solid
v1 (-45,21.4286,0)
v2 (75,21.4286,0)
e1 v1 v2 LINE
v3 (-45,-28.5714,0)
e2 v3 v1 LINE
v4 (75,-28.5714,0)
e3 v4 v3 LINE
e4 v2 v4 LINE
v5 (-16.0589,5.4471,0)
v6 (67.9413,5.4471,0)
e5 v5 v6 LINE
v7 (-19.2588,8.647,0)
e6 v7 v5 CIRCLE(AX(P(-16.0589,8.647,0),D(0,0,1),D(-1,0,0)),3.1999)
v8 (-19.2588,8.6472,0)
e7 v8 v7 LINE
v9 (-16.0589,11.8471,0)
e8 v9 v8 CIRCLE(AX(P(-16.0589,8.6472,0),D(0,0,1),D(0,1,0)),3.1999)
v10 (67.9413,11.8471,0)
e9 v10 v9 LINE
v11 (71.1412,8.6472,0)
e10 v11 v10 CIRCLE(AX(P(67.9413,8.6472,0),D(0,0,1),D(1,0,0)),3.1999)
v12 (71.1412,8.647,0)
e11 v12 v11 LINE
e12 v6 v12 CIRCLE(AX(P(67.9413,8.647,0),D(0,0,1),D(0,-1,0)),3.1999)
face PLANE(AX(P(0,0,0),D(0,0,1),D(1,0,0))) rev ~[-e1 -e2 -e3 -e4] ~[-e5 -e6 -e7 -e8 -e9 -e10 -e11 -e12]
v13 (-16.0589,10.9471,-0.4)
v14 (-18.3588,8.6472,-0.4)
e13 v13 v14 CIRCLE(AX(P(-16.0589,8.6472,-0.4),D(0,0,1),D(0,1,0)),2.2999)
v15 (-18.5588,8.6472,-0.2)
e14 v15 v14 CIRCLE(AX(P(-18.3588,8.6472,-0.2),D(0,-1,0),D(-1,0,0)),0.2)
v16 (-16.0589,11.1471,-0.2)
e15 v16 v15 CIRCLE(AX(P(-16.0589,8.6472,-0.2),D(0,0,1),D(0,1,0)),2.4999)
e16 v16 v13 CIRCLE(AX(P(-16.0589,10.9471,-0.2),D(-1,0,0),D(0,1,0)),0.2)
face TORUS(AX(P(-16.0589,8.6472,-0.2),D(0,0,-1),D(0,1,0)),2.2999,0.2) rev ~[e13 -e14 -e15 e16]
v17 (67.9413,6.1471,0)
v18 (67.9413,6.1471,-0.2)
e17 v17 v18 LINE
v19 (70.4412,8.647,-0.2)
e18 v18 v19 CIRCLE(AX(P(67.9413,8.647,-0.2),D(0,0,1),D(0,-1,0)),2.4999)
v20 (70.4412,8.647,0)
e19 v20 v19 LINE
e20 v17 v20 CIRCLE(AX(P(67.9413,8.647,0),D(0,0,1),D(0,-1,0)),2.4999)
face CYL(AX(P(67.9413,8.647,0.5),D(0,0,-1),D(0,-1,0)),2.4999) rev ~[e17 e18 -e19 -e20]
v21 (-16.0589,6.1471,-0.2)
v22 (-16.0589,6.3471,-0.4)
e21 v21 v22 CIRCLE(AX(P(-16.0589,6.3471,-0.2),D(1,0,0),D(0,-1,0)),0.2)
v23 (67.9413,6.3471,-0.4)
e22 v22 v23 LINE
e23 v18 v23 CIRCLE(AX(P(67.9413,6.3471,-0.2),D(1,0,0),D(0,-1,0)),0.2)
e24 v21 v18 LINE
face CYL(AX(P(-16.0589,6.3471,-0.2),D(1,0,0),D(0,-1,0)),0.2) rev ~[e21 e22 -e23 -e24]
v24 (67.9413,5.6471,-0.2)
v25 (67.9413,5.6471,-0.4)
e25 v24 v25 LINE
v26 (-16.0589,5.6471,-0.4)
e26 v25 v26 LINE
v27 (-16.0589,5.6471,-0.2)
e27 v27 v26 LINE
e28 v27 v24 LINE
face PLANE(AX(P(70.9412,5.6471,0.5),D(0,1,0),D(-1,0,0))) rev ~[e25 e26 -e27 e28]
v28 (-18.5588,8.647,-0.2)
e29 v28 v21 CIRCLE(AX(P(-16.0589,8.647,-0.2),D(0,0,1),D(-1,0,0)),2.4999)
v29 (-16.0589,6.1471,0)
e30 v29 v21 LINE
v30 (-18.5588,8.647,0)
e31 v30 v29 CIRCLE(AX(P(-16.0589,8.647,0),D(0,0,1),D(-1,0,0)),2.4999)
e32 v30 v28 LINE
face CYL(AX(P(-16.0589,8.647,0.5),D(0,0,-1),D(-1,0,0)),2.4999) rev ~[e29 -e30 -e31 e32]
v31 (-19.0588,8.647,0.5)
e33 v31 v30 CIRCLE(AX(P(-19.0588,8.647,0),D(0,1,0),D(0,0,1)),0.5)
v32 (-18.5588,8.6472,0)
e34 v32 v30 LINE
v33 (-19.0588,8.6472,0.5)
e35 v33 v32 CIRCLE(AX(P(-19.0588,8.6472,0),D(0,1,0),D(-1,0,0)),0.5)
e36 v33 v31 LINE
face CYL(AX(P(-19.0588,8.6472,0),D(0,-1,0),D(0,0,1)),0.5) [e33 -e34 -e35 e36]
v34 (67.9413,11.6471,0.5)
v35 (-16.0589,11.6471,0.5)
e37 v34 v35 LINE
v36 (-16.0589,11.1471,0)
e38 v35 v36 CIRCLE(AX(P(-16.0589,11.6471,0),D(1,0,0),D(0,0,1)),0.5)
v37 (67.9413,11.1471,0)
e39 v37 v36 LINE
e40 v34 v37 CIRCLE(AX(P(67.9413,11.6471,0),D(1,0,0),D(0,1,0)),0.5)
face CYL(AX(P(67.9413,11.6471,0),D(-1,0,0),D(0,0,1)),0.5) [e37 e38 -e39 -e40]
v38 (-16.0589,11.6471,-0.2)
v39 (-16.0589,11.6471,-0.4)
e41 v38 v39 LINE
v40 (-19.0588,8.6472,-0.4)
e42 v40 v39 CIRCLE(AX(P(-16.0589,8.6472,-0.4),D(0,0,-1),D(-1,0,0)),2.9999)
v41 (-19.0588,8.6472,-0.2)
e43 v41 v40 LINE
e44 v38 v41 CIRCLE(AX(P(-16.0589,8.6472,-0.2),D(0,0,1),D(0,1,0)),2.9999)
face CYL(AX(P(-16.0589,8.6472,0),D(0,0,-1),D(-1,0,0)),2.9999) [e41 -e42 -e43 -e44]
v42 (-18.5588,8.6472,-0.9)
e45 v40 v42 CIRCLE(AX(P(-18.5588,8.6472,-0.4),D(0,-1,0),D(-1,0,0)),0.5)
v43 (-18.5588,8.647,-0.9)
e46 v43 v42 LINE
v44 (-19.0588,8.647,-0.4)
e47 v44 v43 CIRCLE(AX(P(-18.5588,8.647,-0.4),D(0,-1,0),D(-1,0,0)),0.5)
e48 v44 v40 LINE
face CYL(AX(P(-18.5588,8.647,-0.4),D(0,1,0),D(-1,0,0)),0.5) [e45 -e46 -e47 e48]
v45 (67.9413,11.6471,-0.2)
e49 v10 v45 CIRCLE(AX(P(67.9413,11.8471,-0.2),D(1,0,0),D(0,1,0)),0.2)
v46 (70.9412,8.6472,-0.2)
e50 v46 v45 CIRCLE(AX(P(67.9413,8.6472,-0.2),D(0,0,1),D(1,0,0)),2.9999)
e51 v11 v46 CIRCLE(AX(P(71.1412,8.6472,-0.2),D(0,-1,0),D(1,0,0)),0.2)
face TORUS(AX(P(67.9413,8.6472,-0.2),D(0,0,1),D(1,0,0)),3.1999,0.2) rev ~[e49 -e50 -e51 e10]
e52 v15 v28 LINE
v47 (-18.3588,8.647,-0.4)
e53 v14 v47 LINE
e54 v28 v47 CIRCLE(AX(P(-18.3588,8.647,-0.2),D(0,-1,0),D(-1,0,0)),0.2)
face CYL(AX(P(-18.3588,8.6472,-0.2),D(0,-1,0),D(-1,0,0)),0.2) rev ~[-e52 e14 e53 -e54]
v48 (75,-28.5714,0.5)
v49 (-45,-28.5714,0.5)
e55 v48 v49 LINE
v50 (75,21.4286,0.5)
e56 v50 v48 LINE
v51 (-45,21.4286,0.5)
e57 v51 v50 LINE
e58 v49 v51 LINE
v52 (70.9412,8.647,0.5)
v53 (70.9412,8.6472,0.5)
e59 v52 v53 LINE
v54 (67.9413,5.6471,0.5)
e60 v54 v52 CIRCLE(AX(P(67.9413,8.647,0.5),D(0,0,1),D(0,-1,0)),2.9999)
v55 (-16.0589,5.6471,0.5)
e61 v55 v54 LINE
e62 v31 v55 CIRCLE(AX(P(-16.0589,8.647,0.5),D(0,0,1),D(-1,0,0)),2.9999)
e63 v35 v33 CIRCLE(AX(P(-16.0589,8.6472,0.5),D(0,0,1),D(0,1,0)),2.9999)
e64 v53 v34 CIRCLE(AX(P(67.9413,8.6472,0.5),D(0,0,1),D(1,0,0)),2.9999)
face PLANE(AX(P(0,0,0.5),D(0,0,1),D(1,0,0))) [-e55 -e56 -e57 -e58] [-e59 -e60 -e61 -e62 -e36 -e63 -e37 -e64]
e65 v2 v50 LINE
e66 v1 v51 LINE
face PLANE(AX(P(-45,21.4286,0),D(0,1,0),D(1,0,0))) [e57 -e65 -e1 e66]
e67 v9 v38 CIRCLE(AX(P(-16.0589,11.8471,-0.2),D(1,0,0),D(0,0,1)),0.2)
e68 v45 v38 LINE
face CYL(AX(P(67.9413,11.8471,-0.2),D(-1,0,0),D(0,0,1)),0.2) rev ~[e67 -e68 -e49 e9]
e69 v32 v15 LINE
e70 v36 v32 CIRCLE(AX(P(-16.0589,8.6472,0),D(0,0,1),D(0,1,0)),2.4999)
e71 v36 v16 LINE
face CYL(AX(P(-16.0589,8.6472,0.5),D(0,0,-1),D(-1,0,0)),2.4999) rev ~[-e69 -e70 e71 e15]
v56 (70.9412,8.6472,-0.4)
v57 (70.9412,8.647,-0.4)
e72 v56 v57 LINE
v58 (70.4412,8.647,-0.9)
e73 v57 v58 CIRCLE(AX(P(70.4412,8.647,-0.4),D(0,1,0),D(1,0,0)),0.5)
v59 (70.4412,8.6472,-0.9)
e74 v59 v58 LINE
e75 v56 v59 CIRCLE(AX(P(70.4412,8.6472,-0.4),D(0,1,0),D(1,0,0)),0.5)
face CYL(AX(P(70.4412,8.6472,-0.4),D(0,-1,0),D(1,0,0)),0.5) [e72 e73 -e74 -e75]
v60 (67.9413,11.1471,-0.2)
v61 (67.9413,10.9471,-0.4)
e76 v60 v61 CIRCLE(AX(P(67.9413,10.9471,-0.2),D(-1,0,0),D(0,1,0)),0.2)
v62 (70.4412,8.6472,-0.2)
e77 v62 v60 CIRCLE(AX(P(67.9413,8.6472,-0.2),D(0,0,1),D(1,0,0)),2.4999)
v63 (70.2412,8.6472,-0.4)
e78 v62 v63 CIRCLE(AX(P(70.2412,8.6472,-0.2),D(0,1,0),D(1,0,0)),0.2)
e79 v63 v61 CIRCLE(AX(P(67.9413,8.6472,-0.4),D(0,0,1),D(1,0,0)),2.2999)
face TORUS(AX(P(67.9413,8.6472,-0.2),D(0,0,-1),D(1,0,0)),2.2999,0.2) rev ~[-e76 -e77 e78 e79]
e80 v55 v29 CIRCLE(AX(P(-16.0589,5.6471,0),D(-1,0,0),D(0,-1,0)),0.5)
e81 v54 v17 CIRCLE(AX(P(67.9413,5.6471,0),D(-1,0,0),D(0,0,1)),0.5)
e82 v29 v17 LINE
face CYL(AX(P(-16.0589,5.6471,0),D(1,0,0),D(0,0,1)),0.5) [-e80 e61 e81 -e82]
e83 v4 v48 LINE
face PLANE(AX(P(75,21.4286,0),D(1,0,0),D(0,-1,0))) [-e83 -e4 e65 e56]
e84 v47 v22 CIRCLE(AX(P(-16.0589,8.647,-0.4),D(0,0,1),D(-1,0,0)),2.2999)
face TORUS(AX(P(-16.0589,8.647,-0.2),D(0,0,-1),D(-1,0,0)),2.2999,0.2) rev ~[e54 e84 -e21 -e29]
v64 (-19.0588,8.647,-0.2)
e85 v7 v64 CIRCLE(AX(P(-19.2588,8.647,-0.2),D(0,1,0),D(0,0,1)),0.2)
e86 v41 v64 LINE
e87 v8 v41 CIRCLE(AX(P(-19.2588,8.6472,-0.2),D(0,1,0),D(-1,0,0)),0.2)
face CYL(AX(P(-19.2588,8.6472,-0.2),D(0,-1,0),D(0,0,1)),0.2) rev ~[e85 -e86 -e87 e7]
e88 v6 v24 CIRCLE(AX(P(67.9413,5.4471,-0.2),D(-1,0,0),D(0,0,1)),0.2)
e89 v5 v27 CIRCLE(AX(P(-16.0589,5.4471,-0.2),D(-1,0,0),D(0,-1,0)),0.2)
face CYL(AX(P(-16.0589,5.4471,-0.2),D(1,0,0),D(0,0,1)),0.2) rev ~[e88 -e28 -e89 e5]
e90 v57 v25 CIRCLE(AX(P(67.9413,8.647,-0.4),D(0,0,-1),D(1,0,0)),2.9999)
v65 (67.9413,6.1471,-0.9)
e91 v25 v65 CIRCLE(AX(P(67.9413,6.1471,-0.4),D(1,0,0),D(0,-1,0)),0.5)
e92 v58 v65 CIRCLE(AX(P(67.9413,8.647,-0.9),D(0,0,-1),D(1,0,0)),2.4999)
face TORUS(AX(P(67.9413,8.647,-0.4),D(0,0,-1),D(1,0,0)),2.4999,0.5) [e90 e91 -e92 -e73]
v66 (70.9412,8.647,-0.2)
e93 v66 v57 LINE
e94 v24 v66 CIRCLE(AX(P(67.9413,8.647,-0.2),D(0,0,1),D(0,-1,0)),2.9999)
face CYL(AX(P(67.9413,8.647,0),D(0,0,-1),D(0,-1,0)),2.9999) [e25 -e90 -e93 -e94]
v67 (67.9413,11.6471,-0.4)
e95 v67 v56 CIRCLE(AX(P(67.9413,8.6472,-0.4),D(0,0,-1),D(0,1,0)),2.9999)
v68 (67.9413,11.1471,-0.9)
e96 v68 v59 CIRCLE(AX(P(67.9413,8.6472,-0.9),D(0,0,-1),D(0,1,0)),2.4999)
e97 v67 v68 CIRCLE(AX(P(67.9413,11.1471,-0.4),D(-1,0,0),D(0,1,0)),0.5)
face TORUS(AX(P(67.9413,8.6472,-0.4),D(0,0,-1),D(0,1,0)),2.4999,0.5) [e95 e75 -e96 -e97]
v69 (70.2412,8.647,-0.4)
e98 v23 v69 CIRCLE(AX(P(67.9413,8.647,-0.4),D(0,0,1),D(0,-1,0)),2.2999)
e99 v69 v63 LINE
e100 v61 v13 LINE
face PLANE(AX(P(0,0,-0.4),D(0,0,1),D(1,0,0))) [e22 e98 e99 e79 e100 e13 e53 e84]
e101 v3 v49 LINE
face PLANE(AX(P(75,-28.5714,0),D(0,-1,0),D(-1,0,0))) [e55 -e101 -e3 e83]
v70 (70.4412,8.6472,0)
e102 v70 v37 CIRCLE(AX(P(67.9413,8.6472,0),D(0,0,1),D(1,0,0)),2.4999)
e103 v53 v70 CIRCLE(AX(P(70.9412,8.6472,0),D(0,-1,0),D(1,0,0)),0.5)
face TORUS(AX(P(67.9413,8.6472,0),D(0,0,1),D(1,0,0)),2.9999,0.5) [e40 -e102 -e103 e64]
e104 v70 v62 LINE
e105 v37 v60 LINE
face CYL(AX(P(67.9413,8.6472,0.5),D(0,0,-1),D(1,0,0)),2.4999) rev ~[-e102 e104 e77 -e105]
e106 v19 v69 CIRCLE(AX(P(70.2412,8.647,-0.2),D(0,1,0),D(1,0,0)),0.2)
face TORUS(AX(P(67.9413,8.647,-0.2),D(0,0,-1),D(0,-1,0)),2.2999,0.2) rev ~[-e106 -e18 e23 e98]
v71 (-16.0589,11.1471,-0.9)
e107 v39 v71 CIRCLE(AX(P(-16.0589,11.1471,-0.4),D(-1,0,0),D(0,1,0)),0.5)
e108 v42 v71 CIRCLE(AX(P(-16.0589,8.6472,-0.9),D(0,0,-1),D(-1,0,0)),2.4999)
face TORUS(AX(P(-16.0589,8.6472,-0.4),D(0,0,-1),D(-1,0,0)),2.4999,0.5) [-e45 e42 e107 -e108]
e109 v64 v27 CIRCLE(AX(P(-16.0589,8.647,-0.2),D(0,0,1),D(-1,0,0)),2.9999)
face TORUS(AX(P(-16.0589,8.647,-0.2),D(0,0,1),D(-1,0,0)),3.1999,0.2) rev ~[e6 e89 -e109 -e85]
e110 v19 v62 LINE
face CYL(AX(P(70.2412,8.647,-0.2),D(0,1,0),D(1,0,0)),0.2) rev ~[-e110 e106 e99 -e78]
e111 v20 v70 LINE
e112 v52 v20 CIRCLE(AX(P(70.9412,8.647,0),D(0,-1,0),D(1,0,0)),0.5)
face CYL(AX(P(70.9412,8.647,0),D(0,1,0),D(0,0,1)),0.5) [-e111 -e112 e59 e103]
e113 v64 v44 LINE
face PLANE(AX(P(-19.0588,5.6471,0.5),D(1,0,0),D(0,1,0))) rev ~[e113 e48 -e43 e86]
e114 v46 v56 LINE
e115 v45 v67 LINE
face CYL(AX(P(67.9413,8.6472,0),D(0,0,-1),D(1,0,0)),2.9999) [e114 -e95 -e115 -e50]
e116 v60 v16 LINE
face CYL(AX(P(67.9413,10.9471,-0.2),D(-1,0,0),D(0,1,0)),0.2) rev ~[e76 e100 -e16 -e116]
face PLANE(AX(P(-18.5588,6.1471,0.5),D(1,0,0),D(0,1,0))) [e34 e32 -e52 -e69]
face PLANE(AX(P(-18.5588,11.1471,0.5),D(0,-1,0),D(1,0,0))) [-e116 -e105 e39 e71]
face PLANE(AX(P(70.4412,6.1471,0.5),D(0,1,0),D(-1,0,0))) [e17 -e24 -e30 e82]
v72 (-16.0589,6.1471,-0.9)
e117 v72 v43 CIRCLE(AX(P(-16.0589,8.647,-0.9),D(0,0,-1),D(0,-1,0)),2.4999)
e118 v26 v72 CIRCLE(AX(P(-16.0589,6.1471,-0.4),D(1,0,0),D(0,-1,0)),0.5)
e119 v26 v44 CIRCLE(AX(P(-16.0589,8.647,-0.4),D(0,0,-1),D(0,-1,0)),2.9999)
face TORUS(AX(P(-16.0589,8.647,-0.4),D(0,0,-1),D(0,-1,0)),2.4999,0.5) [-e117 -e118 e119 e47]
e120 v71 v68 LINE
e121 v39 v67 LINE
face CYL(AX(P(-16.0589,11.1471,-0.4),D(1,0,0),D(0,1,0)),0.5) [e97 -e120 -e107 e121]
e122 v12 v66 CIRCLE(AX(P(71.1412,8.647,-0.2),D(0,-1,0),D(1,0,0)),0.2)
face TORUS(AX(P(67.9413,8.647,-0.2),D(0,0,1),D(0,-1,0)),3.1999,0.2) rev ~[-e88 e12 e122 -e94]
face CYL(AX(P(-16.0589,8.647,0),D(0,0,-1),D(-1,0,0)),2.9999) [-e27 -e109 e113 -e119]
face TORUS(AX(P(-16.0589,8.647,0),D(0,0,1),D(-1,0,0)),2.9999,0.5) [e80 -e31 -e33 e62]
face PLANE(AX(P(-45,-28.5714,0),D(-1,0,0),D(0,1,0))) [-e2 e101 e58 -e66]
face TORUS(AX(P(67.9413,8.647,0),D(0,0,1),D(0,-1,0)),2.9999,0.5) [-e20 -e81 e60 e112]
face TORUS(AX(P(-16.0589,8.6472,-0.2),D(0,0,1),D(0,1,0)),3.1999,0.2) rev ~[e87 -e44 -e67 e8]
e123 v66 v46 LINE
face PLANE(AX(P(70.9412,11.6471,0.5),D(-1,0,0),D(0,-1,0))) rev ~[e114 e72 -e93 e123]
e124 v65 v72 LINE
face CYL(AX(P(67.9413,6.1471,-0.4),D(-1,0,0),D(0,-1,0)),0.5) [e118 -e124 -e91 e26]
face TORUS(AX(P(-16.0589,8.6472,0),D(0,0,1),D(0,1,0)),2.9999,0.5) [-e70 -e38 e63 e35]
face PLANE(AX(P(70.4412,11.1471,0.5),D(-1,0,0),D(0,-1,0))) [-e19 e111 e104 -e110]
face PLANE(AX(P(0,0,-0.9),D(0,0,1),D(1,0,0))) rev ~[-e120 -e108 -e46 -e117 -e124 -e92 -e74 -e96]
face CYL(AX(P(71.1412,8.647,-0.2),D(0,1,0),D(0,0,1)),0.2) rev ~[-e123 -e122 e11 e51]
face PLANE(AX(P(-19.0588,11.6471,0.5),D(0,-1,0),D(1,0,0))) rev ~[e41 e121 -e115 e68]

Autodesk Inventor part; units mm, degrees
ref_plane "YZ Plane" through (0, 0, 0) normal (1, 0, 0) x (0, 1, 0)
ref_plane "XZ Plane" through (0, 0, 0) normal (0, 1, 0) x (-1, 0, 0)
ref_plane "XY Plane" through (0, 0, 0) normal (0, 0, 1) x (1, 0, 0)
sketch "Sketch1" plane through (0, 0, 0) normal (0, 0, 1) x (1, 0, 0)
  line L0 (-45, 21.4286) -> (75, 21.4286)
  line L1 (75, 21.4286) -> (75, -28.5714)
  line L2 (75, -28.5714) -> (-45, -28.5714)
  line L3 (-45, -28.5714) -> (-45, 21.4286)
  point P0 (0, 0)
  dimension "d0" = 50
  dimension "d1" = 120
extrude "Plate1" add sketch "Sketch1" along normal blind 0.5
sketch "Sketch2" plane through (0, 0, 0.5) normal (0, 0, 1) x (1, 0, 0)
  line L0 (-19.0588, 11.6471) -> (70.9412, 11.6471)
  line L1 (70.9412, 11.6471) -> (70.9412, 5.6471)
  line L2 (70.9412, 5.6471) -> (-19.0588, 5.6471)
  line L3 (-19.0588, 5.6471) -> (-19.0588, 11.6471)
  point P0 (0, 0)
  point P1 (25.9412, 8.6471)
  dimension "LG_A" = 90
  dimension "LT_A" = 6
  dimension "d5" = 45
  dimension "d6" = 3
extrude "Extrusion1" add sketch "Sketch2" against normal blind 1.4
sketch "Sketch3" plane through (0, 0, 0.5) normal (0, 0, 1) x (1, 0, 0)
  line L0 (-19.0588, 5.6471) -> (-19.0588, 11.6471) projected
  line L1 (-19.0588, 11.6471) -> (70.9412, 11.6471) projected
  line L2 (70.9412, 11.6471) -> (70.9412, 5.6471) projected
  line L3 (70.9412, 5.6471) -> (-19.0588, 5.6471) projected
  line L4 (-18.5588, 11.1471) -> (70.4412, 11.1471)
  line L5 (70.4412, 11.1471) -> (70.4412, 6.1471)
  line L6 (70.4412, 6.1471) -> (-18.5588, 6.1471)
  line L7 (-18.5588, 6.1471) -> (-18.5588, 11.1471)
  point P0 (0, 0)
  dimension "d9" = 0.5
  dimension "d10" = 0.5
  dimension "d11" = 0.5
  dimension "d12" = 0.5
extrude "Extrusion2" cut sketch "Sketch3" against normal blind 0.9 contours L4 L5 L6 L7
fillet "Fillet1" radius 2.5 4 edges at (-18.5588, 6.1471, 0.05) (-18.5588, 11.1471, 0.05) (70.4412, 11.1471, 0.05) (70.4412, 6.1471, 0.05)
fillet "Fillet2" radius 3 4 edges at (70.9412, 11.6471, -0.45) (70.9412, 5.6471, -0.45) (-19.0588, 11.6471, -0.45) (-19.0588, 5.6471, -0.45)
fillet "Fillet3" radius 0.5 8 edges at (-18.1802, 10.7684, -0.9) (25.9412, 11.6471, -0.9) (70.0625, 10.7684, -0.9) (25.9412, 5.6471, -0.9) (69.709, 10.4149, 0.5) (25.9412, 6.1471, 0.5) (-17.8266, 6.8793, 0.5) (25.9412, 11.1471, 0.5)
fillet "Fillet4" radius 0.2 8 edges at (69.709, 10.4149, -0.4) (25.9412, 6.1471, -0.4) (-17.8266, 6.8793, -0.4) (25.9412, 11.1471, -0.4) (70.0625, 10.7684, 0) (25.9412, 11.6471, 0) (-18.1802, 10.7684, 0) (25.9412, 5.6471, 0)
equation "\"d5\" = 0.5 * LG_A"
equation "\"d6\" = 0.5 * LT_A"
equation "\"d9\" = Thickness"
equation "\"d10\" = Thickness"
equation "\"d11\" = Thickness"
equation "\"d12\" = Thickness"
equation "\"d2\" = Thickness"
equation "\"GapSize\" = Thickness"
equation "\"BendRadius\" = Thickness"
equation "\"MinimumRemnant\" = 2 * Thickness"
equation "\"BendReliefDepth\" = 0.5 * Thickness"
equation "\"BendReliefWidth\" = Thickness"
equation "\"CornerReliefSize\" = 4 * Thickness"
equation "\"JacobiRadiusSize\" = BendRadius"
equation "\"TransitionRadius\" = BendRadius"
equation "\"d15\" = 0.5 * LT_A - Thickness"
equation "\"d16\" = 0.5 * LT_A"
equation "\"d17\" = Thickness"
equation "\"Thickness\" = 0.5"
properties part number "Amb"
